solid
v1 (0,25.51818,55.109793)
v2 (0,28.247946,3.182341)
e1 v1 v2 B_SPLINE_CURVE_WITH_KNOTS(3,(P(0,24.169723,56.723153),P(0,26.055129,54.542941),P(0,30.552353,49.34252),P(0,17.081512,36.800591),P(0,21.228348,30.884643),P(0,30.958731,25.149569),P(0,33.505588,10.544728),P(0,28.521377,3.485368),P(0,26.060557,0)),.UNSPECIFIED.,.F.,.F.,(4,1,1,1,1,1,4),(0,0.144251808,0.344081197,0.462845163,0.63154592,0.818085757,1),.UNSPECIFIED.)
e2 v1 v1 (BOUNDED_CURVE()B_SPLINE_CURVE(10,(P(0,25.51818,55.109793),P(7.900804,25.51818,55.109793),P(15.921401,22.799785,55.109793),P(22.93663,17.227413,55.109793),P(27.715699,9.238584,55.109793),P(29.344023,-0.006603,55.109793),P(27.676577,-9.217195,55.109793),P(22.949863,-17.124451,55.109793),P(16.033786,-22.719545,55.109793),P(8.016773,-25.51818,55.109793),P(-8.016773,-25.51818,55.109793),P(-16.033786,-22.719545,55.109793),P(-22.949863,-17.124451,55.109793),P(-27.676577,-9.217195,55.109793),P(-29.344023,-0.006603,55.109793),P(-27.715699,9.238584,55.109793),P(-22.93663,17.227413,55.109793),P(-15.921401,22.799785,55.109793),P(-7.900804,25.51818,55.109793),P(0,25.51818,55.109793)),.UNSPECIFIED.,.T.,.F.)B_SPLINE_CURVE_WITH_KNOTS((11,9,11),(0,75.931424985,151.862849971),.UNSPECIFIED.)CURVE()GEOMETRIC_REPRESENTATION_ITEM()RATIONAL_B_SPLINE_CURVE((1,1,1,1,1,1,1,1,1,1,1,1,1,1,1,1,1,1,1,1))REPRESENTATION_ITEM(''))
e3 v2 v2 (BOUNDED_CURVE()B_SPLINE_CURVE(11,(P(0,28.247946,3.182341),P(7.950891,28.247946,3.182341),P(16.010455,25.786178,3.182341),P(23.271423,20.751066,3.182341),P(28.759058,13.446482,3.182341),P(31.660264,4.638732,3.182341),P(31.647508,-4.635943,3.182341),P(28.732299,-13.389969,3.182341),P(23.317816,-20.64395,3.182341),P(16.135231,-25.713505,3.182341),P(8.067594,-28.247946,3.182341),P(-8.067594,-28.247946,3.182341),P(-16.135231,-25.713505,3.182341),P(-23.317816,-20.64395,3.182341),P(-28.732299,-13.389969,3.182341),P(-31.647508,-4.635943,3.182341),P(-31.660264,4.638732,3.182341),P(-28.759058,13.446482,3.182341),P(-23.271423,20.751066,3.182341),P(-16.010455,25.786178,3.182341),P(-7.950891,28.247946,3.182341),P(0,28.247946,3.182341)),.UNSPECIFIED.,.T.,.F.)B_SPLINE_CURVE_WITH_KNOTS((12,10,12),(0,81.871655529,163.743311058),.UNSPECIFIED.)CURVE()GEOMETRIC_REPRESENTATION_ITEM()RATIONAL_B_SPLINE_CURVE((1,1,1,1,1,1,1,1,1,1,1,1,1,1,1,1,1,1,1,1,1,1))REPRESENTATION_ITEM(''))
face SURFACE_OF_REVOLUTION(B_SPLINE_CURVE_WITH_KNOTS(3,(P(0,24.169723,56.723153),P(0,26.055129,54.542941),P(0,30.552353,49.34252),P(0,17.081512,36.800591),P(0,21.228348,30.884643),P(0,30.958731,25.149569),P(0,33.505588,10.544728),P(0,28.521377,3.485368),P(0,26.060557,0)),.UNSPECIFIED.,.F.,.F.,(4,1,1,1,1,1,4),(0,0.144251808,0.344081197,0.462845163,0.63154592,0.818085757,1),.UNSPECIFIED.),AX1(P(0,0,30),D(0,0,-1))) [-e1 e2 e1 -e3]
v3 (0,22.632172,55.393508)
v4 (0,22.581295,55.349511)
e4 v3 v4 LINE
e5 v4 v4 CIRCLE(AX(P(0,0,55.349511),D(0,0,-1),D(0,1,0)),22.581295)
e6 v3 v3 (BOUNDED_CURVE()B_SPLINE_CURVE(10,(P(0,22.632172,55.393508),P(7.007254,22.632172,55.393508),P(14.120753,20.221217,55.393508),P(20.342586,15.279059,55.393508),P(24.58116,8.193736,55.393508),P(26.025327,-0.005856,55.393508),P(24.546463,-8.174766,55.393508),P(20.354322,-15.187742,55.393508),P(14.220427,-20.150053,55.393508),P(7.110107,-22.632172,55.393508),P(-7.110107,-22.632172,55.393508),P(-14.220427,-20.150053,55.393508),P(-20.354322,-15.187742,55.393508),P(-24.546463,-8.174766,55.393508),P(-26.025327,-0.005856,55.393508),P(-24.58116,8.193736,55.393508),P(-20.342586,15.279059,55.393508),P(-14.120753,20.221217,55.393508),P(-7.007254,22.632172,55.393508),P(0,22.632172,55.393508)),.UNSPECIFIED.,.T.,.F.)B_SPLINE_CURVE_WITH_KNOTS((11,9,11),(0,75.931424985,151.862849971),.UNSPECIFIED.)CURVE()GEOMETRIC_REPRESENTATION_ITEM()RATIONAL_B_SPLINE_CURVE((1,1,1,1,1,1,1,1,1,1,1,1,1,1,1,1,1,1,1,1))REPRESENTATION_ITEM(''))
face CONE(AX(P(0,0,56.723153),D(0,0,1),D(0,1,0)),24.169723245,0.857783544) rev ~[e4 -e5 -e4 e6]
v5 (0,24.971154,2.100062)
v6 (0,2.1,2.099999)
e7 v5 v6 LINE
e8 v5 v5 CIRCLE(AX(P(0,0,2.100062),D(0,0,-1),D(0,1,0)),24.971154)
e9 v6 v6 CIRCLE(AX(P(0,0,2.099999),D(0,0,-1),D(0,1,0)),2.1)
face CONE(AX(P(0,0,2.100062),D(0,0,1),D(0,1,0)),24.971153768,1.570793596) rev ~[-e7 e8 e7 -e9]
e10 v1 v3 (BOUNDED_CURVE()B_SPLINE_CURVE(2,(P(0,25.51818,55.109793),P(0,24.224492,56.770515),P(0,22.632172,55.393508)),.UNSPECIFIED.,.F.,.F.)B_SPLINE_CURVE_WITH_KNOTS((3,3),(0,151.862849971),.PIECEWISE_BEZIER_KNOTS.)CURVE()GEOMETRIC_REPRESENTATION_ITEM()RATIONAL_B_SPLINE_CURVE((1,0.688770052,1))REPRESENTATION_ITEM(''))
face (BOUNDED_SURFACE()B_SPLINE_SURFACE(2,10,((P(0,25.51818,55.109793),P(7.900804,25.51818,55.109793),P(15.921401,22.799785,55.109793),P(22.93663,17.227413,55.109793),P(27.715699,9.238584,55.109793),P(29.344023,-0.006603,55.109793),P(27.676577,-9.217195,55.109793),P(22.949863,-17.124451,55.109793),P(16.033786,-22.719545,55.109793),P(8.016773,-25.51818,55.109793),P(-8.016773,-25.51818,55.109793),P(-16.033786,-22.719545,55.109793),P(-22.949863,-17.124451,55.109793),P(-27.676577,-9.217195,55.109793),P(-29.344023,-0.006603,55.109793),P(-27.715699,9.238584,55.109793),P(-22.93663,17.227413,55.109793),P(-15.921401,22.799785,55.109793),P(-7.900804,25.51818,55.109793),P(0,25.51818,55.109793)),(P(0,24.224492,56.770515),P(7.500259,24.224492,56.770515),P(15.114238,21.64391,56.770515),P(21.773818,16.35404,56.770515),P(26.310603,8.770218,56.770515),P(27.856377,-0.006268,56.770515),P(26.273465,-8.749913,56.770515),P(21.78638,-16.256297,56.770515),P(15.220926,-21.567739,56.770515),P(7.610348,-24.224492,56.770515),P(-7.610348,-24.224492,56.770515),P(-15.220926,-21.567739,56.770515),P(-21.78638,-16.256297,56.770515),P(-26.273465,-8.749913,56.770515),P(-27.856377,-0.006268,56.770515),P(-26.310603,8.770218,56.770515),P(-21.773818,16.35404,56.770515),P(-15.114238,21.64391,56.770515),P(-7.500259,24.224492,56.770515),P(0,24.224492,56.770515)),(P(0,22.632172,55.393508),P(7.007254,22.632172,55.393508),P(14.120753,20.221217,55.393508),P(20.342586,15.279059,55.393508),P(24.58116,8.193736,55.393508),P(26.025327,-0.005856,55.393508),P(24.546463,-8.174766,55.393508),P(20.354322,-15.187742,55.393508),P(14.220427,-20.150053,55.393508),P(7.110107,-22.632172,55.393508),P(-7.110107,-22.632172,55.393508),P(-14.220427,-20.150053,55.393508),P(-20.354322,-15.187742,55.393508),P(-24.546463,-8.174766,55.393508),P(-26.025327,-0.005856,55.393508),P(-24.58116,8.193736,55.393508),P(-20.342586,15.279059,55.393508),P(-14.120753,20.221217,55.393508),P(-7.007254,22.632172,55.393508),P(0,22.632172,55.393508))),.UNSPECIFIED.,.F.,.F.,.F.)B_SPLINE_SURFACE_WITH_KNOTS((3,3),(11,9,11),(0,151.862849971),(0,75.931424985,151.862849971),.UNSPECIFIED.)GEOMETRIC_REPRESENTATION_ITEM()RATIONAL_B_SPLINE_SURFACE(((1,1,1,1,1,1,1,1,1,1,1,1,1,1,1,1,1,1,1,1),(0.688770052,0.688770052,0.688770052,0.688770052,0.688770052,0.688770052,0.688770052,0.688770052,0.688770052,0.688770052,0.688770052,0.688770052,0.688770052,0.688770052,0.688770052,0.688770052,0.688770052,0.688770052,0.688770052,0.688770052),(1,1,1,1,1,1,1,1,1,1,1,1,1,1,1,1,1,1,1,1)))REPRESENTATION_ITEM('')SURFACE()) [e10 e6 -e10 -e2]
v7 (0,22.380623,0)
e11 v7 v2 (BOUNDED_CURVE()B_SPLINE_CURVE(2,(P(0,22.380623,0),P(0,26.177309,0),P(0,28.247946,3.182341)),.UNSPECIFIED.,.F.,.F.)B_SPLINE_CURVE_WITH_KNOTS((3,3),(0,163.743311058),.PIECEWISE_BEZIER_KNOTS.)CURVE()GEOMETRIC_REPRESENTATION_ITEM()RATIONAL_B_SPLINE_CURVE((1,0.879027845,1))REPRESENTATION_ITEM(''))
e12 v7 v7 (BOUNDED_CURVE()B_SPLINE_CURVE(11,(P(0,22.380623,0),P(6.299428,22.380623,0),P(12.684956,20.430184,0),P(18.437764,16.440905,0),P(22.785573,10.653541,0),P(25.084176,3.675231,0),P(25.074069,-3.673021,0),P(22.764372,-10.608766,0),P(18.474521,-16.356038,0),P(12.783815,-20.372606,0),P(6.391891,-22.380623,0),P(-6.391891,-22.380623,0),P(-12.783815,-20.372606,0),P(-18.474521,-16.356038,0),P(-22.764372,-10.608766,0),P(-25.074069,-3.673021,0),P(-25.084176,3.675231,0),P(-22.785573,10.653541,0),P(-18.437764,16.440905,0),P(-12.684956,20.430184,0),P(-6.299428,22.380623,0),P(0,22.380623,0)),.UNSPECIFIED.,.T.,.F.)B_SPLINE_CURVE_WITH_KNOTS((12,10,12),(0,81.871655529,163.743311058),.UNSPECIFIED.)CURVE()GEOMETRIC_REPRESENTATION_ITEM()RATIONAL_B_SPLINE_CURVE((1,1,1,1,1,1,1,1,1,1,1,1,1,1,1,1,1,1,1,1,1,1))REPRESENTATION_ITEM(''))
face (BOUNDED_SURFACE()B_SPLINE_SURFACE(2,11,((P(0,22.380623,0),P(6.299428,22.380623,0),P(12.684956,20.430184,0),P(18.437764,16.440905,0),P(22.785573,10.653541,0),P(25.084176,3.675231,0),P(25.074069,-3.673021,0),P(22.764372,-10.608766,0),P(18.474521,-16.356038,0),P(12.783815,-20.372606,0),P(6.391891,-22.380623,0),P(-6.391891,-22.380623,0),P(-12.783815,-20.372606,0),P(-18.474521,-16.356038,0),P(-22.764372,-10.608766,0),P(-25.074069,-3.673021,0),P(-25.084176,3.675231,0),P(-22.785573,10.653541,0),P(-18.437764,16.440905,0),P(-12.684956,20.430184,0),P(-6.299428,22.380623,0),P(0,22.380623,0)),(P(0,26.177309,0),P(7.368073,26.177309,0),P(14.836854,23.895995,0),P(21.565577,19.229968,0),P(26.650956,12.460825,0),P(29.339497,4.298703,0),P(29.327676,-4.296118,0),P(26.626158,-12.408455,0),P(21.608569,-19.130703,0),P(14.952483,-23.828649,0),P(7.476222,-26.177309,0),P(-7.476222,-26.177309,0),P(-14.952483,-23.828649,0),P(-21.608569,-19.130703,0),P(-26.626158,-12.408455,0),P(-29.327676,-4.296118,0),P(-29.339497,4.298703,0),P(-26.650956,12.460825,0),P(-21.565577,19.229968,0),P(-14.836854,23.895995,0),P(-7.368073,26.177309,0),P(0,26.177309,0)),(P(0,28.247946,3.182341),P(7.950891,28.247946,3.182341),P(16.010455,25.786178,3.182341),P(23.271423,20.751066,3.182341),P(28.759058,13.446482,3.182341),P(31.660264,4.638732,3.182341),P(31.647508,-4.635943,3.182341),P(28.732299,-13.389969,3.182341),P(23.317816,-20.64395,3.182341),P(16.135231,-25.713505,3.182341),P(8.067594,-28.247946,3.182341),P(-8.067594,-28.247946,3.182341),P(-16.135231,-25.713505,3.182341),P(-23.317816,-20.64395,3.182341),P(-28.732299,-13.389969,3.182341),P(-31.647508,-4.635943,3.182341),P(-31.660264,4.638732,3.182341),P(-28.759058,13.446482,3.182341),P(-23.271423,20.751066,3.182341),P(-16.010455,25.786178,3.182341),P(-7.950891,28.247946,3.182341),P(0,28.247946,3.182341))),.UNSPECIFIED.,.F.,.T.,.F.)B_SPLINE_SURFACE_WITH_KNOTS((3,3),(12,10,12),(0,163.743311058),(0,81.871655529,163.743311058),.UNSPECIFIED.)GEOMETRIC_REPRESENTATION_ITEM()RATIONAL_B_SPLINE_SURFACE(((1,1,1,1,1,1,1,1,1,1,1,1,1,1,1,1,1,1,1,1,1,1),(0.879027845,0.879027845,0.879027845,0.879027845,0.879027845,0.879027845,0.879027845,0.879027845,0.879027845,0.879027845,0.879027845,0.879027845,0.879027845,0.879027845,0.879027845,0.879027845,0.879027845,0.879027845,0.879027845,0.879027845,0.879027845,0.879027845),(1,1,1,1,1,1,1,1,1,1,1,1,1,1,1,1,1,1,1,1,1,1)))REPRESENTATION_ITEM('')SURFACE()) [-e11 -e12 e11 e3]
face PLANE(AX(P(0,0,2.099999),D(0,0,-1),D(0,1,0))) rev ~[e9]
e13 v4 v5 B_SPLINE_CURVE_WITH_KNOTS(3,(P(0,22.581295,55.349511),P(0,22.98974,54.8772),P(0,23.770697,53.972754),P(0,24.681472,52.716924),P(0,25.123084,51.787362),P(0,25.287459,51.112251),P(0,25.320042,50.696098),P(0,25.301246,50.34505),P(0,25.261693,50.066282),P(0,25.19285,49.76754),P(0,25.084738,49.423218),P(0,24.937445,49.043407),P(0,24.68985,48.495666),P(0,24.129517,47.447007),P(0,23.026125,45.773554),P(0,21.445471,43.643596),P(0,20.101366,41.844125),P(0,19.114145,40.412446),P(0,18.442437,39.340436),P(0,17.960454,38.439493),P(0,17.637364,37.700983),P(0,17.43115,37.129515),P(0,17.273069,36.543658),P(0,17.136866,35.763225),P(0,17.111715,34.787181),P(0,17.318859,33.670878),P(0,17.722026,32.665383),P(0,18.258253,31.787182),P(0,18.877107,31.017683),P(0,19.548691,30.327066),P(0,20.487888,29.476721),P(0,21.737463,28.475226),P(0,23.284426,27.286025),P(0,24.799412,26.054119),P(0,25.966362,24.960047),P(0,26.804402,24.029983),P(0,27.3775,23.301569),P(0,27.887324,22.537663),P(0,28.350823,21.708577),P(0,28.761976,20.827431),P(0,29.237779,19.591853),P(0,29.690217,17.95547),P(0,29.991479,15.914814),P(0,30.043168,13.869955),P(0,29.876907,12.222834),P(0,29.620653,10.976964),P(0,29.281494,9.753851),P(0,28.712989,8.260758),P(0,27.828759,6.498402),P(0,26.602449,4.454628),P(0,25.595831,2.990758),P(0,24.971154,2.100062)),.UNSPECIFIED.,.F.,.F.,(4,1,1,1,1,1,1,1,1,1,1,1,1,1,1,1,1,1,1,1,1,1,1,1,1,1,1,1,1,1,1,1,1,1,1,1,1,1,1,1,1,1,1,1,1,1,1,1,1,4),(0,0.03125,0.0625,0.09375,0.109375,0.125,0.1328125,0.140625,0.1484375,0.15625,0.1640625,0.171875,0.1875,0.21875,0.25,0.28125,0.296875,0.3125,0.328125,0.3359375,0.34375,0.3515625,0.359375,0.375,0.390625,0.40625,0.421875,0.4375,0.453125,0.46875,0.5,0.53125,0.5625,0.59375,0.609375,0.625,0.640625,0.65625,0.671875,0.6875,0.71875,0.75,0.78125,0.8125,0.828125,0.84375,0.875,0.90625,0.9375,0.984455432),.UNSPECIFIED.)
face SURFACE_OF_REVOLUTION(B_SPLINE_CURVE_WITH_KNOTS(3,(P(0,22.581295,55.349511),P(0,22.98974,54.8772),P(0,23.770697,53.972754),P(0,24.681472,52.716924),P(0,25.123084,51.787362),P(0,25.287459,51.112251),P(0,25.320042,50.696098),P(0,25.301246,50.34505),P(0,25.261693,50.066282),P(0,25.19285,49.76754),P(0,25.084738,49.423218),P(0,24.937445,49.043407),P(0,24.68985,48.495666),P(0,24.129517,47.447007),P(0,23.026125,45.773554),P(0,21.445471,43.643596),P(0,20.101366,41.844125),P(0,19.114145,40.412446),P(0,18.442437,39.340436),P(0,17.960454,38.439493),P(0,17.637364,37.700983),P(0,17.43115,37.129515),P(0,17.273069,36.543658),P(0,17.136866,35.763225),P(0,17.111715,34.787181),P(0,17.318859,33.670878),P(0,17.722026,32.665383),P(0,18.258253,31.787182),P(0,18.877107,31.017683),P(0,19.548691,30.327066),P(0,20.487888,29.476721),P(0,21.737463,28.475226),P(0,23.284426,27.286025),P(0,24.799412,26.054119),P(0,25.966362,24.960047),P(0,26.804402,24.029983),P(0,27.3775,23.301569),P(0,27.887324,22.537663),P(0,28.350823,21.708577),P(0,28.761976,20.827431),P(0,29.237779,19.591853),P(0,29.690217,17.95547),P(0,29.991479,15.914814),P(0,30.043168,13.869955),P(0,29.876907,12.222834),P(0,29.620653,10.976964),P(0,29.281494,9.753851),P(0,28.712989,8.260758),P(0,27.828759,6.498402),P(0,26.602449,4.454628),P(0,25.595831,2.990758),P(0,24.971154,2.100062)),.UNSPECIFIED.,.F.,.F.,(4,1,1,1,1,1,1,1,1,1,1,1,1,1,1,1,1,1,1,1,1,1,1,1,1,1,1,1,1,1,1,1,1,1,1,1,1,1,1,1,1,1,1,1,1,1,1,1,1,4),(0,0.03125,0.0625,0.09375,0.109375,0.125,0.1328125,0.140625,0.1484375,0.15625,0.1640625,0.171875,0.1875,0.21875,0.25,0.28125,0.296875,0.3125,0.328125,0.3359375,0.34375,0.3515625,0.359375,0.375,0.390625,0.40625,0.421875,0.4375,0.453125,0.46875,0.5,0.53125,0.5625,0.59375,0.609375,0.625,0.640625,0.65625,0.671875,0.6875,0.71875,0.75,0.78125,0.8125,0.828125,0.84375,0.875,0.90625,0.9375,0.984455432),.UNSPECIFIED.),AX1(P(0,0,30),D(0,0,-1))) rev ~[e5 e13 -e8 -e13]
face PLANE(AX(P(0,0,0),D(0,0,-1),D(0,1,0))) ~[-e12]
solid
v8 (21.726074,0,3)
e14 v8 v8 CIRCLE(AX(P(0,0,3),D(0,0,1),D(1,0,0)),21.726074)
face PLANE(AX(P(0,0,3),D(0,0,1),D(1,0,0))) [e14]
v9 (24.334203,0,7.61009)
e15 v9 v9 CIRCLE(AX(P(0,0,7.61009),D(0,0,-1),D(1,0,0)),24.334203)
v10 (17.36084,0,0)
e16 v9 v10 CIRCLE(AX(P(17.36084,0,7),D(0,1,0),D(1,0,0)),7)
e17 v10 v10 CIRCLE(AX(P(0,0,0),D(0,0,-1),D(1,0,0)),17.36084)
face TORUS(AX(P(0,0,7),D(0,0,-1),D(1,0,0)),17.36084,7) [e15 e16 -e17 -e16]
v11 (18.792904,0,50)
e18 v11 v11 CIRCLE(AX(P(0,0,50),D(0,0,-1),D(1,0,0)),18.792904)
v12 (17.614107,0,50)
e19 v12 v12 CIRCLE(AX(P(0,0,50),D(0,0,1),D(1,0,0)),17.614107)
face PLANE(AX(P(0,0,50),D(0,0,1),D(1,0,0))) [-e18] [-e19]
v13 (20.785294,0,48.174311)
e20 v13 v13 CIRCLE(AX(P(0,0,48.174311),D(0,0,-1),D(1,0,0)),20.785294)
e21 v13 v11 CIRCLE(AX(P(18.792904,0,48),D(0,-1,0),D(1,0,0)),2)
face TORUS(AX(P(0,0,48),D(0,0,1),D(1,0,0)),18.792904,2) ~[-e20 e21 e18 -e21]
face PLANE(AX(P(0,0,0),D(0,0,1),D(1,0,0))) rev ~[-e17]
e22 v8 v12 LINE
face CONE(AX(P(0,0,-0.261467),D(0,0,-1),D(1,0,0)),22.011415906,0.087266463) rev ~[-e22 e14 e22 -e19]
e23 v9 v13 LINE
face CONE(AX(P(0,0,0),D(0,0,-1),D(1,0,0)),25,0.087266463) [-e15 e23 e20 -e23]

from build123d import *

# Parameters (mm, degrees)
F0_R     = 25
F1_DEPTH = 50
F1_TAPER = 5
F2_T     = -3
F3_R     = 2
F4_R     = 7
F7_R     = 7
F8_R     = 2


# Not quite as in the source:
# - ends of sketch curves that miss each other by under 0.0002 mm in the source are joined
# - the dataset's text gives a spline's control points without its knots; the knots are read off the source's solid


with BuildPart() as f1:
    # F0 (on Top) → F1 (new body)
    with BuildSketch(Plane.XY):
        Circle(F0_R)
    extrude(amount=F1_DEPTH, taper=F1_TAPER)

    # F2
    f2_openings = [f1.faces().sort_by_distance(p)[0] for p in [
        (0, 0, 50),
    ]]
    offset(amount=F2_T, openings=f2_openings)

    # F3
    f3_edges = [f1.edges().sort_by_distance(p)[0] for p in [
        (-20.625567, 0, 50),
    ]]
    fillet(f3_edges, radius=F3_R)

    # F4
    f4_edges = [f1.edges().sort_by_distance(p)[0] for p in [
        (-25, 0, 0),
    ]]
    fillet(f4_edges, radius=F4_R)


with BuildPart() as f6:
    # F5 (on Right) → F6 (revolve)
    with BuildSketch(Plane.YZ):
        with BuildLine():
            Line((2.1, 2.0999993639), (0, 2.0999993639))
            Line((0, 2.0999993639), (0, 0))
            Line((0, 0), (26.0605573531, 0))
            add(Edge.make_bspline(
                [(24.1697232449, 56.7231529161), (26.0551290778, 54.5429406989), (30.5523531052, 49.3425203983), (17.0815117654, 36.800591071), (21.2283478934, 30.8846429659), (30.9587308555, 25.149568849), (33.5055876288, 10.5447282676), (28.5213767516, 3.4853682137), (26.0605573531, 0)],
                knots=[0, 0, 0, 0, 0.1442518077, 0.3440811968, 0.4628451634, 0.6315459202, 0.8180857573, 1, 1, 1, 1], degree=3))
            Line((24.1697232449, 56.7231529161), (22.5812950581, 55.3495105959))
            add(Edge.make_bspline(
                [(22.5812950581, 55.3495105959), (22.9897400767, 54.8772001765), (23.7706969525, 53.972754158), (24.6814723031, 52.7169237229), (25.1230837979, 51.7873623848), (25.2874590889, 51.1122511584), (25.320042367, 50.6960977325), (25.3012460207, 50.3450500597), (25.2616927496, 50.0662819887), (25.192850277, 49.7675399855), (25.0847384746, 49.4232182849), (24.9374447705, 49.0434068247), (24.6898502595, 48.4956659856), (24.1295166651, 47.4470065113), (23.0261245636, 45.7735542576), (21.4454705837, 43.6435964543), (20.101366334, 41.8441250249), (19.114144807, 40.4124464453), (18.4424366998, 39.3404357899), (17.9604535555, 38.4394931704), (17.6373640956, 37.7009829924), (17.4311501496, 37.1295148001), (17.2730687275, 36.5436577418), (17.1368659625, 35.7632254815), (17.1117153283, 34.7871814502), (17.3188593508, 33.6708781977), (17.7220256738, 32.6653829285), (18.2582530643, 31.7871819258), (18.8771070407, 31.0176834707), (19.5486912207, 30.327066101), (20.487888479, 29.4767214419), (21.7374633706, 28.4752259511), (23.2844257726, 27.2860247996), (24.7994115838, 26.0541188863), (25.9663615661, 24.9600466839), (26.8044019971, 24.0299833736), (27.3774998894, 23.3015691796), (27.8873241821, 22.5376629268), (28.3508229857, 21.7085774881), (28.7619757686, 20.8274313328), (29.2377794397, 19.5918530483), (29.6902165857, 17.9554699242), (29.9914790738, 15.9148141047), (30.0431675635, 13.8699547442), (29.876907299, 12.2228342576), (29.6206529923, 10.97696407), (29.2814943641, 9.7538509383), (28.7129889766, 8.2607580834), (27.8287590901, 6.4984016536), (26.6024491617, 4.4546284909), (25.5958306642, 2.990758045), (24.9711537683, 2.1000618259)],
                knots=[0, 0, 0, 0, 0.03125, 0.0625, 0.09375, 0.109375, 0.125, 0.1328125, 0.140625, 0.1484375, 0.15625, 0.1640625, 0.171875, 0.1875, 0.21875, 0.25, 0.28125, 0.296875, 0.3125, 0.328125, 0.3359375, 0.34375, 0.3515625, 0.359375, 0.375, 0.390625, 0.40625, 0.421875, 0.4375, 0.453125, 0.46875, 0.5, 0.53125, 0.5625, 0.59375, 0.609375, 0.625, 0.640625, 0.65625, 0.671875, 0.6875, 0.71875, 0.75, 0.78125, 0.8125, 0.828125, 0.84375, 0.875, 0.90625, 0.9375, 0.9844554316, 0.9844554316, 0.9844554316, 0.9844554316], degree=3))
            Line((24.9711537683, 2.1000618259), (2.1, 2.0999993639))
        make_face()
    revolve(axis=Axis((0, 0, 30), (0, 0, -1)))

    # F7
    f7_edges = [f6.edges().sort_by_distance(p)[0] for p in [
        (0, -26.060557, 0),
    ]]
    fillet(f7_edges, radius=F7_R)

    # F8
    f8_edges = [f6.edges().sort_by_distance(p)[0] for p in [
        (0, -24.169723, 56.723153),
    ]]
    fillet(f8_edges, radius=F8_R)


solid = Compound([f1.part, f6.part])
